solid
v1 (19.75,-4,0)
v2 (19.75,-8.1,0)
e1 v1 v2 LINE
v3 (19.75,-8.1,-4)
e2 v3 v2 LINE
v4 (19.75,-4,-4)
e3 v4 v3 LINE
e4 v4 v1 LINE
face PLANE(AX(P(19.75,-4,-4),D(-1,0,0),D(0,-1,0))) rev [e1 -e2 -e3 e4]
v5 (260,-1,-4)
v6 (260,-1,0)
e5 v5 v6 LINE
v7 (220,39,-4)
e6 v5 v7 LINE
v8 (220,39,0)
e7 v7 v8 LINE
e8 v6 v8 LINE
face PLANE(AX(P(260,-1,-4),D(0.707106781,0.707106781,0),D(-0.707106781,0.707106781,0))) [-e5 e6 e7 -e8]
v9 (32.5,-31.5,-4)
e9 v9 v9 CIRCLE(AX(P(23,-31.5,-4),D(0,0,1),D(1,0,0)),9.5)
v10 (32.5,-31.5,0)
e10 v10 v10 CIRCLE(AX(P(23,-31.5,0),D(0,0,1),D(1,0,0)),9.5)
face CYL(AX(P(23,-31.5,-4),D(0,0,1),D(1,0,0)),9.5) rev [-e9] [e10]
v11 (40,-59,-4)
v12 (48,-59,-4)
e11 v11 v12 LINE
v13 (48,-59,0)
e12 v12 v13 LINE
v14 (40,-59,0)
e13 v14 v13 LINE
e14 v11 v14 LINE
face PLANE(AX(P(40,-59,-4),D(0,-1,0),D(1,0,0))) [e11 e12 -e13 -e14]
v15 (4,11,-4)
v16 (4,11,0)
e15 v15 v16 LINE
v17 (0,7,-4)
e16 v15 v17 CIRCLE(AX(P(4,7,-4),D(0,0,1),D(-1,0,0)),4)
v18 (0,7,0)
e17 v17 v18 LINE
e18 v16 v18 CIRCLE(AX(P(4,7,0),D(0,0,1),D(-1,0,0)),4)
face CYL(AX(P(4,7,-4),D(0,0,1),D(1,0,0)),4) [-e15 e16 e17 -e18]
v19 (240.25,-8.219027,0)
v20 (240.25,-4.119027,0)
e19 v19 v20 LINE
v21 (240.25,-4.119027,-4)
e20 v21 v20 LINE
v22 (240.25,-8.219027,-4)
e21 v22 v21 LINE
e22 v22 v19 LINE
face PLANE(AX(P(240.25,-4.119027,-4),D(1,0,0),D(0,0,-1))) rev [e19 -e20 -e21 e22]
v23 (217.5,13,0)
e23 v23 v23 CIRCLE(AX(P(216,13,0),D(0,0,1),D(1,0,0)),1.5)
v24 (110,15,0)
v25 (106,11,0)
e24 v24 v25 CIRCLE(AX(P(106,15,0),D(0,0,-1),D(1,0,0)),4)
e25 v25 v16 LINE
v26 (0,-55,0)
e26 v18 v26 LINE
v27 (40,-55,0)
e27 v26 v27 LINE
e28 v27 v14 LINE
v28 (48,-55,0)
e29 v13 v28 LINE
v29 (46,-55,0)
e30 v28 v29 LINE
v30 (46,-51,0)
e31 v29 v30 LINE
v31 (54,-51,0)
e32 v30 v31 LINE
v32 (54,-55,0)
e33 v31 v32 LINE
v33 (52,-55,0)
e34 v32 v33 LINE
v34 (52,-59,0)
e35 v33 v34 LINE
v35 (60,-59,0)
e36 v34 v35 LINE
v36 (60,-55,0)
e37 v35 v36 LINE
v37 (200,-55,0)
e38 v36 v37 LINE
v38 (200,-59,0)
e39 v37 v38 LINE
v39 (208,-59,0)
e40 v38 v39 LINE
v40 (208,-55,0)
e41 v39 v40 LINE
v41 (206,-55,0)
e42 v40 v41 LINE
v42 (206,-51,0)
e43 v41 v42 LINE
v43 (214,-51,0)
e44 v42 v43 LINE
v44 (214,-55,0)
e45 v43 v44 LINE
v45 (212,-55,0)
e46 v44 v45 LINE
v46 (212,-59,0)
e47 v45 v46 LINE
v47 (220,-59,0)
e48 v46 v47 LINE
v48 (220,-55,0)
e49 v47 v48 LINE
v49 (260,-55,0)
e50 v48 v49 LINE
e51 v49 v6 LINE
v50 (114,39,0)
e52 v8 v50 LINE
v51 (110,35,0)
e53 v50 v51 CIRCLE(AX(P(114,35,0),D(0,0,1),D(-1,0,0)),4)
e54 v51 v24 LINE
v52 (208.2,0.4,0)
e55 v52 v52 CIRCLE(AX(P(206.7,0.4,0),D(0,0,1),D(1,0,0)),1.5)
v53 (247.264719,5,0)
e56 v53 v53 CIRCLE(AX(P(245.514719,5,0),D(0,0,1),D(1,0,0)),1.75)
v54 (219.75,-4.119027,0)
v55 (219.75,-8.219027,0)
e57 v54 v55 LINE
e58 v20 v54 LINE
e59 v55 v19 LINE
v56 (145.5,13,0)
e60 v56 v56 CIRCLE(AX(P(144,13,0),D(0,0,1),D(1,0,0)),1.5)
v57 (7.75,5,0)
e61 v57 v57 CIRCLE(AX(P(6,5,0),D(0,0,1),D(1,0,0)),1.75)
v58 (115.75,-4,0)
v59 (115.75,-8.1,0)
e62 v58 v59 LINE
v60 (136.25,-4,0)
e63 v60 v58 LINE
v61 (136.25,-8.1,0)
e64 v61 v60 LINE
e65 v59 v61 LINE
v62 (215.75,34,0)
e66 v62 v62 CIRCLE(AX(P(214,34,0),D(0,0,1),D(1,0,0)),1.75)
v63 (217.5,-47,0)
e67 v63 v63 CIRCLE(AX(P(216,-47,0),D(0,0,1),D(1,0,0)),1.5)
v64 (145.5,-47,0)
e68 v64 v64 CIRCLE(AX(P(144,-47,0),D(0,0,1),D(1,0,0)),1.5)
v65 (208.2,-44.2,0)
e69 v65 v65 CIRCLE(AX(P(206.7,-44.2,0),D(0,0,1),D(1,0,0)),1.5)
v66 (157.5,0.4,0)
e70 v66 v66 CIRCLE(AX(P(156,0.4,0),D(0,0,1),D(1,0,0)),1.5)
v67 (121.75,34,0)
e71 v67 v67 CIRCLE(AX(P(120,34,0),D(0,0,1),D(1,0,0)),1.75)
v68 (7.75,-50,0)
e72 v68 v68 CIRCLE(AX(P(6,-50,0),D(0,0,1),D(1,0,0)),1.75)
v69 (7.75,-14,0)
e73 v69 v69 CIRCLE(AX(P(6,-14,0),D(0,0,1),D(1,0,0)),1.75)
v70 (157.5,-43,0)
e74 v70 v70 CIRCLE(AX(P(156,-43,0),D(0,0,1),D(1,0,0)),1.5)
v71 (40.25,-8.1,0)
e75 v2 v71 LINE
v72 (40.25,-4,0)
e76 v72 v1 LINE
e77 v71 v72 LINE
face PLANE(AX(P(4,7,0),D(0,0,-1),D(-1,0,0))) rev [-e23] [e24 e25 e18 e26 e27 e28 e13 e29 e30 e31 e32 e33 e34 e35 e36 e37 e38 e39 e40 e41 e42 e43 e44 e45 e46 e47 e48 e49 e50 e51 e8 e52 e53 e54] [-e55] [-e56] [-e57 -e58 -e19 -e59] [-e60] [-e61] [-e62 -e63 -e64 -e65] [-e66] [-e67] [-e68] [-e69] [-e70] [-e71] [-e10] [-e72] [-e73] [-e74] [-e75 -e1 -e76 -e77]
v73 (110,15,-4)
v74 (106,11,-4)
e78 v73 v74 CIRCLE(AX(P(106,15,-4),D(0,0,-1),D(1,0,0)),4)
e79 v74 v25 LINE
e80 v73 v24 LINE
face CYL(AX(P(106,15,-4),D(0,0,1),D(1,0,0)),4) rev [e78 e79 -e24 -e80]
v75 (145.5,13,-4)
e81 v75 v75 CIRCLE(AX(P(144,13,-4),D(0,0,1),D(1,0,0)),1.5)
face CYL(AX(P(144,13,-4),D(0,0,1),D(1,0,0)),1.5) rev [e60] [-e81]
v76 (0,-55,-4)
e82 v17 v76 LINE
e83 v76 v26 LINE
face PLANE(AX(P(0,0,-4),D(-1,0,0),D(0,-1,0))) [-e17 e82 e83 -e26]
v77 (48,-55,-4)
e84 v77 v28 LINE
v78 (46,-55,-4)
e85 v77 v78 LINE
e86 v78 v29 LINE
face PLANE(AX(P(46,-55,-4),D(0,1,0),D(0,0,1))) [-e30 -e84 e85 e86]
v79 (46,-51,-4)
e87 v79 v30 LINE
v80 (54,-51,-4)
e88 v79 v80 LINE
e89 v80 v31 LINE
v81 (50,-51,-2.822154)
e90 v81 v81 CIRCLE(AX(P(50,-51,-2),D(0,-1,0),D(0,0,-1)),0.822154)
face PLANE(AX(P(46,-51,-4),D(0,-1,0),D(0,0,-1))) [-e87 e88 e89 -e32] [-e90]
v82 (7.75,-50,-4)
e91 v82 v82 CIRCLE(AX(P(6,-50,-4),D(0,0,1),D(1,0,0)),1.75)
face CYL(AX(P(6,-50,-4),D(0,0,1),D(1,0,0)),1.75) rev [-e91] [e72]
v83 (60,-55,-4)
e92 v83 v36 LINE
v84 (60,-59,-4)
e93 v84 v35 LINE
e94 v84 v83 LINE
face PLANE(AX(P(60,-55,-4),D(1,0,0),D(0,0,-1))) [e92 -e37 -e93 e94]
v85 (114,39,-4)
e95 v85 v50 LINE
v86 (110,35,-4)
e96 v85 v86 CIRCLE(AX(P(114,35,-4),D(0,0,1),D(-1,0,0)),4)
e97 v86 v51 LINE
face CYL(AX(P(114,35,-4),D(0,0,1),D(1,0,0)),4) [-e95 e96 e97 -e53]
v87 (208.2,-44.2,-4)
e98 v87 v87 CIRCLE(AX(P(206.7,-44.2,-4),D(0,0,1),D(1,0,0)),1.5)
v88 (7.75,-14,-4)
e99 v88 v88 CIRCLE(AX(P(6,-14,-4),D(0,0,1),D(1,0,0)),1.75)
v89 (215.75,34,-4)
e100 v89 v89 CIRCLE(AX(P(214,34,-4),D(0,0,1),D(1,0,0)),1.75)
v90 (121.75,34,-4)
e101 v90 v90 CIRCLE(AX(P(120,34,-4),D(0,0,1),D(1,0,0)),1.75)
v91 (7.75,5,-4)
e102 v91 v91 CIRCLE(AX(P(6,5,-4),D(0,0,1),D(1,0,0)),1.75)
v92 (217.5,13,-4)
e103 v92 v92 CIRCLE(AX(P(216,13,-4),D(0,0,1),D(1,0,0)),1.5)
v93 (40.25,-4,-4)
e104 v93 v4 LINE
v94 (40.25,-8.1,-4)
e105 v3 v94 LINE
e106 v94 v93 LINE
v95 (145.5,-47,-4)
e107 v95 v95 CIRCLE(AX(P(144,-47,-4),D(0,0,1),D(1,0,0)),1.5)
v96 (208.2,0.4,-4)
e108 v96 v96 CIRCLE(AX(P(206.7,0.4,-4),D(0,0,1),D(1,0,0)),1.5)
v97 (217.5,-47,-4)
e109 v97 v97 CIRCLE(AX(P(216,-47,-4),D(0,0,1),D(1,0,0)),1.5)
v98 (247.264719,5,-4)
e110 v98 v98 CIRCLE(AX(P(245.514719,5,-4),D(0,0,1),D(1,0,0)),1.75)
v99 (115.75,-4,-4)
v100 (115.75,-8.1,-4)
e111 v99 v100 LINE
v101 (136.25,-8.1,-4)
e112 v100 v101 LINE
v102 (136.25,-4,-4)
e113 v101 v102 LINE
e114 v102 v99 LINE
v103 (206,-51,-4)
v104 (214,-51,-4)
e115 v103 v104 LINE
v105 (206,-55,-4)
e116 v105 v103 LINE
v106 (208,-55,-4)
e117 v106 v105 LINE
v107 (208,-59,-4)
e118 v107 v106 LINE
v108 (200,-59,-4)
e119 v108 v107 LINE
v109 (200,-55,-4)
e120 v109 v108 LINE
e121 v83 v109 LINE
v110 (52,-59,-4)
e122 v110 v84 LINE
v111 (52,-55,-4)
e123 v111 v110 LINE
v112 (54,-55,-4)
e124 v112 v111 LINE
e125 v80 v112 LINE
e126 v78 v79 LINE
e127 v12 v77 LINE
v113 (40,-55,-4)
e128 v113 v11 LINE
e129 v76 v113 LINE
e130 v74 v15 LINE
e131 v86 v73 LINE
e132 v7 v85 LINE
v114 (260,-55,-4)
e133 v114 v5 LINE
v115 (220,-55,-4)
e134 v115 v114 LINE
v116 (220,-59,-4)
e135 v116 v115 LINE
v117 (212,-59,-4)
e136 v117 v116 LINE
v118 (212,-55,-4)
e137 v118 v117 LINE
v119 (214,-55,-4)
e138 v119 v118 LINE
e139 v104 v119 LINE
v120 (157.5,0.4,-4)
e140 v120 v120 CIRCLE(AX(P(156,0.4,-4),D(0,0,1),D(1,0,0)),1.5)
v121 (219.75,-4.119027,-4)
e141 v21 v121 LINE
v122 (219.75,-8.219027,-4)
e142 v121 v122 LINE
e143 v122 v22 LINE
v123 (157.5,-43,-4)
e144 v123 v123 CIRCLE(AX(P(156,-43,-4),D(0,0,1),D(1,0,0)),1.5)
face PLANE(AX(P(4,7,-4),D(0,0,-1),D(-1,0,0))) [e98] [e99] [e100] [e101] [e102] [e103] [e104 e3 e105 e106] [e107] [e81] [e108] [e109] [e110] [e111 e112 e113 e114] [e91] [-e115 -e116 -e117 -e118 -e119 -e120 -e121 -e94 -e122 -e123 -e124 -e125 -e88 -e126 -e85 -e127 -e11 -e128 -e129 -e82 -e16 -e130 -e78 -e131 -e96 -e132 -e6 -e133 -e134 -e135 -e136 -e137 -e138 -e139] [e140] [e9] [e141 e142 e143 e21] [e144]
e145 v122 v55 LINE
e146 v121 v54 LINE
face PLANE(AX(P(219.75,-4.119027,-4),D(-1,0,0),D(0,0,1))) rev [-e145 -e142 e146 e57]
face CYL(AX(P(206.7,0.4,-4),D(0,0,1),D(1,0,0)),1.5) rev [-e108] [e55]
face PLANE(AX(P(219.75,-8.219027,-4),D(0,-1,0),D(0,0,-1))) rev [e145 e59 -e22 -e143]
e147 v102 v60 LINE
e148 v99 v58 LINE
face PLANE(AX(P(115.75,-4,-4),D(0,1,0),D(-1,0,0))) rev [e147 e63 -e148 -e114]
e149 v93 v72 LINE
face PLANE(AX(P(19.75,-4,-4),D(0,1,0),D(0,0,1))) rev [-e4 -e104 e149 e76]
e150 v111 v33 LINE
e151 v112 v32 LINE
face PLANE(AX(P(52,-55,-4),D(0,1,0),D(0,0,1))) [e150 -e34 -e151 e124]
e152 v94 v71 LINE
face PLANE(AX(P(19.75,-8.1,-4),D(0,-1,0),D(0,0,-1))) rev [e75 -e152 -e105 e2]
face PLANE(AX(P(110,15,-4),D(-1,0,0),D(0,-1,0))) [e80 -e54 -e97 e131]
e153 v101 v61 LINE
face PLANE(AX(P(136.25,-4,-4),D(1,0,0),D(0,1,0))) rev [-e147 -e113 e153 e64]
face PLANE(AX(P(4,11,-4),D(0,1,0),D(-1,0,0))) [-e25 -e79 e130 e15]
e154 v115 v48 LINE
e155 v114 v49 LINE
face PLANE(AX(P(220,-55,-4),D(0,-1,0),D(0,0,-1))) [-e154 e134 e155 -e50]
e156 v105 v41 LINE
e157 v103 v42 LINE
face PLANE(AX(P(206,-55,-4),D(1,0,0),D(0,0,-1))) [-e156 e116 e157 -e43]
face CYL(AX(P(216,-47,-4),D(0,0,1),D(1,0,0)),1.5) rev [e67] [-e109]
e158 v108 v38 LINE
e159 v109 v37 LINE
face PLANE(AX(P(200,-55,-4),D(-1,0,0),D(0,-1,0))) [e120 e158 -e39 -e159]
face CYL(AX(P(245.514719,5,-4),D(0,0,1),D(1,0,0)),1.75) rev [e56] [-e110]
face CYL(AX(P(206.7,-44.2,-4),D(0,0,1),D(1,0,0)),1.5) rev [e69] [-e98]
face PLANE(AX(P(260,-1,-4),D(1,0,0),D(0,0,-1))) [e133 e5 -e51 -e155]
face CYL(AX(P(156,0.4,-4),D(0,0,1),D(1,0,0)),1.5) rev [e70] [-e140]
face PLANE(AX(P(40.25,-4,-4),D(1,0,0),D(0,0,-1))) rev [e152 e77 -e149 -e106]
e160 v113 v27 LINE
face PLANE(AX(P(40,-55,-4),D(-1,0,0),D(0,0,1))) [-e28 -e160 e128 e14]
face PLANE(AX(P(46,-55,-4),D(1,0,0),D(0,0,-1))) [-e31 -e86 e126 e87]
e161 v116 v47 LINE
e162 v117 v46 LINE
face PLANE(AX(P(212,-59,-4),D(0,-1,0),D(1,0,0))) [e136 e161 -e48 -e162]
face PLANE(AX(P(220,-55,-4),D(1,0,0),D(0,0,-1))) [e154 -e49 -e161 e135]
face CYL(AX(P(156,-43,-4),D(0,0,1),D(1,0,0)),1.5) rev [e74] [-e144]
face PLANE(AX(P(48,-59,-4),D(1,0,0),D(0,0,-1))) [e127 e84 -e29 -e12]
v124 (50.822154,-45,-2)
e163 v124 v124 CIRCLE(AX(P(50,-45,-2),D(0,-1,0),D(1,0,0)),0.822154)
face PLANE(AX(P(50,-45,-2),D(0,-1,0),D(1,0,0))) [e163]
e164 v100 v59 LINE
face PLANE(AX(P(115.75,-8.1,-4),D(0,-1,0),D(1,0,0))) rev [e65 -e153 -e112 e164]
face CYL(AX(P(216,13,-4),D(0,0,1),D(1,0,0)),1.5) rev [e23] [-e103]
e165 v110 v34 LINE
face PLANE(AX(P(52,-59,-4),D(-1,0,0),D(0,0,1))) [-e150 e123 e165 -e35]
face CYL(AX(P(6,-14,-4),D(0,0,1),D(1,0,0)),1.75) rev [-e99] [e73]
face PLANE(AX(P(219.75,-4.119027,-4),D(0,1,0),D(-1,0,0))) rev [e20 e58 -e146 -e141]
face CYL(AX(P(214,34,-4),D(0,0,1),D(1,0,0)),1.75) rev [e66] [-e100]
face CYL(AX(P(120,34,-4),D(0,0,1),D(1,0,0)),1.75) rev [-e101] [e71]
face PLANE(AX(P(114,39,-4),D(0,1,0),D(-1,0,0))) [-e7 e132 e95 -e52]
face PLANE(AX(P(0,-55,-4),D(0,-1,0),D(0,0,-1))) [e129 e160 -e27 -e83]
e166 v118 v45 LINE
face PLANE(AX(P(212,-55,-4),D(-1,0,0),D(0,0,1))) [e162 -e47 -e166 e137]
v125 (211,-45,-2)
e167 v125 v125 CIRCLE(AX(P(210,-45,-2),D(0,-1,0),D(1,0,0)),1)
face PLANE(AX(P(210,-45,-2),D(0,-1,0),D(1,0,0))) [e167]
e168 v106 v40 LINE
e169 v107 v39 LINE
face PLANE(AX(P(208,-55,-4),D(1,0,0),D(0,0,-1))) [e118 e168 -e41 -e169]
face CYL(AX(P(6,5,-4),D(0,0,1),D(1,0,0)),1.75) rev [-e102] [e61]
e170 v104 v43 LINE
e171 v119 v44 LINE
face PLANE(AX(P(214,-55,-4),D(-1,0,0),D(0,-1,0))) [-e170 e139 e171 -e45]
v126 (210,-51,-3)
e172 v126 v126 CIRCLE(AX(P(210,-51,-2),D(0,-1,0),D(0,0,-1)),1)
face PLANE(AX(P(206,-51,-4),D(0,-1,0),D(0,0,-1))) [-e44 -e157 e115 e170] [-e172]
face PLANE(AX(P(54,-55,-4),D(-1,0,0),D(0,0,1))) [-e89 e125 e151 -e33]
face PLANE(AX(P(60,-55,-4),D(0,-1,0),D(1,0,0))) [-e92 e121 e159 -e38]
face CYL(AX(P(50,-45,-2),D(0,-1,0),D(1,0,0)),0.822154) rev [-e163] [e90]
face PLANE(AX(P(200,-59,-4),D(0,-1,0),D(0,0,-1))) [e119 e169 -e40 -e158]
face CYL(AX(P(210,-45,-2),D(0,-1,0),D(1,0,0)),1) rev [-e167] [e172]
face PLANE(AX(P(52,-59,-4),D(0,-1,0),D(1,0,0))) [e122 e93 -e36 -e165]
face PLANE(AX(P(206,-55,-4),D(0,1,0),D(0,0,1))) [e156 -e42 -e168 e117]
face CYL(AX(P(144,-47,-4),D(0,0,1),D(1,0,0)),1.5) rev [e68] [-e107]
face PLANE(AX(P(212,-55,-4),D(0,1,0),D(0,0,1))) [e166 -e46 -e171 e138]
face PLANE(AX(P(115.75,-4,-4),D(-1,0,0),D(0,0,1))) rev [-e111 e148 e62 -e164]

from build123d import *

# Parameters (mm, degrees)
SKETCH_1_R             = 9.5
SKETCH_1_R_2           = 1.5
SKETCH_1_W             = 20.5
SKETCH_1_H             = 4.1
SM_BASE_FLANGE_1_DEPTH = 4
SKETCH_6_R             = 1.75
CUT_EXTRUDE_1_DEPTH    = 267.640207021
SKETCH_8_R             = 1
SKETCH_8_R_2           = 0.822154456
CUT_EXTRUDE_3_DEPTH    = 10


# Sheet-metal steps are written as plain solids
with BuildPart() as part:
    # Sketch 1 → Базовая кромка1 (new body)
    with BuildSketch(Plane.XY):
        with BuildLine():
            Line((52, -59), (60, -59))
            Line((60, -59), (60, -55))
            Line((60, -55), (200, -55))
            Line((200, -55), (200, -59))
            Line((200, -59), (208, -59))
            Line((208, -59), (208, -55))
            Line((208, -55), (206, -55))
            Line((206, -55), (206, -51))
            Line((206, -51), (214, -51))
            Line((214, -51), (214, -55))
            Line((214, -55), (212, -55))
            Line((212, -55), (212, -59))
            Line((212, -59), (220, -59))
            Line((220, -59), (220, -55))
            Line((220, -55), (260, -55))
            Line((260, -55), (260, -1))
            Line((260, -1), (220, 39))
            Line((220, 39), (120, 39))
            Line((120, 39), (114, 39))
            ThreePointArc((114, 39), (111.171572875, 37.828427125), (110, 35))
            Line((110, 35), (110, 15))
            ThreePointArc((110, 15), (108.828427125, 12.171572875), (106, 11))
            Line((106, 11), (4, 11))
            ThreePointArc((4, 11), (1.171572875, 9.828427125), (0, 7))
            Line((0, 7), (0, 0))
            Line((0, 0), (0, -55))
            Line((0, -55), (40, -55))
            Line((40, -55), (40, -59))
            Line((40, -59), (48, -59))
            Line((48, -59), (48, -55))
            Line((48, -55), (46, -55))
            Line((46, -55), (46, -51))
            Line((46, -51), (54, -51))
            Line((54, -51), (54, -55))
            Line((54, -55), (52, -55))
            Line((52, -55), (52, -59))
        make_face()
        with Locations((23, -31.5)):
            Circle(SKETCH_1_R, mode=Mode.SUBTRACT)
        with Locations((156, -43)):
            Circle(SKETCH_1_R_2, mode=Mode.SUBTRACT)
        with Locations((206.7, 0.4)):
            Circle(SKETCH_1_R_2, mode=Mode.SUBTRACT)
        with Locations((156, 0.4)):
            Circle(SKETCH_1_R_2, mode=Mode.SUBTRACT)
        with Locations((206.7, -44.2)):
            Circle(SKETCH_1_R_2, mode=Mode.SUBTRACT)
        with Locations((144, -47)):
            Circle(SKETCH_1_R_2, mode=Mode.SUBTRACT)
        with Locations((216, -47)):
            Circle(SKETCH_1_R_2, mode=Mode.SUBTRACT)
        with Locations((216, 13)):
            Circle(SKETCH_1_R_2, mode=Mode.SUBTRACT)
        with Locations((144, 13)):
            Circle(SKETCH_1_R_2, mode=Mode.SUBTRACT)
        with Locations((30, -6.05)):
            Rectangle(SKETCH_1_W, SKETCH_1_H, mode=Mode.SUBTRACT)
        with Locations((230, -6.169027082)):
            Rectangle(SKETCH_1_W, SKETCH_1_H, mode=Mode.SUBTRACT)
        with Locations((126, -6.05)):
            Rectangle(SKETCH_1_W, SKETCH_1_H, mode=Mode.SUBTRACT)
    extrude(amount=-SM_BASE_FLANGE_1_DEPTH)

    # Эскиз6 → Вырез-Вытянуть1 (cut, through all)
    with BuildSketch(Plane.XY):
        with Locations((6, 5)):
            Circle(SKETCH_6_R)
        with Locations((120, 34)):
            Circle(SKETCH_6_R)
        with Locations((214, 34)):
            Circle(SKETCH_6_R)
        with Locations((245.514718626, 5)):
            Circle(SKETCH_6_R)
        with Locations((6, -14)):
            Circle(SKETCH_6_R)
        with Locations((6, -50)):
            Circle(SKETCH_6_R)
    extrude(amount=-CUT_EXTRUDE_1_DEPTH, mode=Mode.SUBTRACT)

    # Эскиз8 → Вырез-Вытянуть3 (cut)
    with BuildSketch(Plane.XZ.offset(55)):
        with Locations((210, -2)):
            Circle(SKETCH_8_R)
        with Locations((50, -2)):
            Circle(SKETCH_8_R_2)
    extrude(amount=-CUT_EXTRUDE_3_DEPTH, mode=Mode.SUBTRACT)


solid = part.part
